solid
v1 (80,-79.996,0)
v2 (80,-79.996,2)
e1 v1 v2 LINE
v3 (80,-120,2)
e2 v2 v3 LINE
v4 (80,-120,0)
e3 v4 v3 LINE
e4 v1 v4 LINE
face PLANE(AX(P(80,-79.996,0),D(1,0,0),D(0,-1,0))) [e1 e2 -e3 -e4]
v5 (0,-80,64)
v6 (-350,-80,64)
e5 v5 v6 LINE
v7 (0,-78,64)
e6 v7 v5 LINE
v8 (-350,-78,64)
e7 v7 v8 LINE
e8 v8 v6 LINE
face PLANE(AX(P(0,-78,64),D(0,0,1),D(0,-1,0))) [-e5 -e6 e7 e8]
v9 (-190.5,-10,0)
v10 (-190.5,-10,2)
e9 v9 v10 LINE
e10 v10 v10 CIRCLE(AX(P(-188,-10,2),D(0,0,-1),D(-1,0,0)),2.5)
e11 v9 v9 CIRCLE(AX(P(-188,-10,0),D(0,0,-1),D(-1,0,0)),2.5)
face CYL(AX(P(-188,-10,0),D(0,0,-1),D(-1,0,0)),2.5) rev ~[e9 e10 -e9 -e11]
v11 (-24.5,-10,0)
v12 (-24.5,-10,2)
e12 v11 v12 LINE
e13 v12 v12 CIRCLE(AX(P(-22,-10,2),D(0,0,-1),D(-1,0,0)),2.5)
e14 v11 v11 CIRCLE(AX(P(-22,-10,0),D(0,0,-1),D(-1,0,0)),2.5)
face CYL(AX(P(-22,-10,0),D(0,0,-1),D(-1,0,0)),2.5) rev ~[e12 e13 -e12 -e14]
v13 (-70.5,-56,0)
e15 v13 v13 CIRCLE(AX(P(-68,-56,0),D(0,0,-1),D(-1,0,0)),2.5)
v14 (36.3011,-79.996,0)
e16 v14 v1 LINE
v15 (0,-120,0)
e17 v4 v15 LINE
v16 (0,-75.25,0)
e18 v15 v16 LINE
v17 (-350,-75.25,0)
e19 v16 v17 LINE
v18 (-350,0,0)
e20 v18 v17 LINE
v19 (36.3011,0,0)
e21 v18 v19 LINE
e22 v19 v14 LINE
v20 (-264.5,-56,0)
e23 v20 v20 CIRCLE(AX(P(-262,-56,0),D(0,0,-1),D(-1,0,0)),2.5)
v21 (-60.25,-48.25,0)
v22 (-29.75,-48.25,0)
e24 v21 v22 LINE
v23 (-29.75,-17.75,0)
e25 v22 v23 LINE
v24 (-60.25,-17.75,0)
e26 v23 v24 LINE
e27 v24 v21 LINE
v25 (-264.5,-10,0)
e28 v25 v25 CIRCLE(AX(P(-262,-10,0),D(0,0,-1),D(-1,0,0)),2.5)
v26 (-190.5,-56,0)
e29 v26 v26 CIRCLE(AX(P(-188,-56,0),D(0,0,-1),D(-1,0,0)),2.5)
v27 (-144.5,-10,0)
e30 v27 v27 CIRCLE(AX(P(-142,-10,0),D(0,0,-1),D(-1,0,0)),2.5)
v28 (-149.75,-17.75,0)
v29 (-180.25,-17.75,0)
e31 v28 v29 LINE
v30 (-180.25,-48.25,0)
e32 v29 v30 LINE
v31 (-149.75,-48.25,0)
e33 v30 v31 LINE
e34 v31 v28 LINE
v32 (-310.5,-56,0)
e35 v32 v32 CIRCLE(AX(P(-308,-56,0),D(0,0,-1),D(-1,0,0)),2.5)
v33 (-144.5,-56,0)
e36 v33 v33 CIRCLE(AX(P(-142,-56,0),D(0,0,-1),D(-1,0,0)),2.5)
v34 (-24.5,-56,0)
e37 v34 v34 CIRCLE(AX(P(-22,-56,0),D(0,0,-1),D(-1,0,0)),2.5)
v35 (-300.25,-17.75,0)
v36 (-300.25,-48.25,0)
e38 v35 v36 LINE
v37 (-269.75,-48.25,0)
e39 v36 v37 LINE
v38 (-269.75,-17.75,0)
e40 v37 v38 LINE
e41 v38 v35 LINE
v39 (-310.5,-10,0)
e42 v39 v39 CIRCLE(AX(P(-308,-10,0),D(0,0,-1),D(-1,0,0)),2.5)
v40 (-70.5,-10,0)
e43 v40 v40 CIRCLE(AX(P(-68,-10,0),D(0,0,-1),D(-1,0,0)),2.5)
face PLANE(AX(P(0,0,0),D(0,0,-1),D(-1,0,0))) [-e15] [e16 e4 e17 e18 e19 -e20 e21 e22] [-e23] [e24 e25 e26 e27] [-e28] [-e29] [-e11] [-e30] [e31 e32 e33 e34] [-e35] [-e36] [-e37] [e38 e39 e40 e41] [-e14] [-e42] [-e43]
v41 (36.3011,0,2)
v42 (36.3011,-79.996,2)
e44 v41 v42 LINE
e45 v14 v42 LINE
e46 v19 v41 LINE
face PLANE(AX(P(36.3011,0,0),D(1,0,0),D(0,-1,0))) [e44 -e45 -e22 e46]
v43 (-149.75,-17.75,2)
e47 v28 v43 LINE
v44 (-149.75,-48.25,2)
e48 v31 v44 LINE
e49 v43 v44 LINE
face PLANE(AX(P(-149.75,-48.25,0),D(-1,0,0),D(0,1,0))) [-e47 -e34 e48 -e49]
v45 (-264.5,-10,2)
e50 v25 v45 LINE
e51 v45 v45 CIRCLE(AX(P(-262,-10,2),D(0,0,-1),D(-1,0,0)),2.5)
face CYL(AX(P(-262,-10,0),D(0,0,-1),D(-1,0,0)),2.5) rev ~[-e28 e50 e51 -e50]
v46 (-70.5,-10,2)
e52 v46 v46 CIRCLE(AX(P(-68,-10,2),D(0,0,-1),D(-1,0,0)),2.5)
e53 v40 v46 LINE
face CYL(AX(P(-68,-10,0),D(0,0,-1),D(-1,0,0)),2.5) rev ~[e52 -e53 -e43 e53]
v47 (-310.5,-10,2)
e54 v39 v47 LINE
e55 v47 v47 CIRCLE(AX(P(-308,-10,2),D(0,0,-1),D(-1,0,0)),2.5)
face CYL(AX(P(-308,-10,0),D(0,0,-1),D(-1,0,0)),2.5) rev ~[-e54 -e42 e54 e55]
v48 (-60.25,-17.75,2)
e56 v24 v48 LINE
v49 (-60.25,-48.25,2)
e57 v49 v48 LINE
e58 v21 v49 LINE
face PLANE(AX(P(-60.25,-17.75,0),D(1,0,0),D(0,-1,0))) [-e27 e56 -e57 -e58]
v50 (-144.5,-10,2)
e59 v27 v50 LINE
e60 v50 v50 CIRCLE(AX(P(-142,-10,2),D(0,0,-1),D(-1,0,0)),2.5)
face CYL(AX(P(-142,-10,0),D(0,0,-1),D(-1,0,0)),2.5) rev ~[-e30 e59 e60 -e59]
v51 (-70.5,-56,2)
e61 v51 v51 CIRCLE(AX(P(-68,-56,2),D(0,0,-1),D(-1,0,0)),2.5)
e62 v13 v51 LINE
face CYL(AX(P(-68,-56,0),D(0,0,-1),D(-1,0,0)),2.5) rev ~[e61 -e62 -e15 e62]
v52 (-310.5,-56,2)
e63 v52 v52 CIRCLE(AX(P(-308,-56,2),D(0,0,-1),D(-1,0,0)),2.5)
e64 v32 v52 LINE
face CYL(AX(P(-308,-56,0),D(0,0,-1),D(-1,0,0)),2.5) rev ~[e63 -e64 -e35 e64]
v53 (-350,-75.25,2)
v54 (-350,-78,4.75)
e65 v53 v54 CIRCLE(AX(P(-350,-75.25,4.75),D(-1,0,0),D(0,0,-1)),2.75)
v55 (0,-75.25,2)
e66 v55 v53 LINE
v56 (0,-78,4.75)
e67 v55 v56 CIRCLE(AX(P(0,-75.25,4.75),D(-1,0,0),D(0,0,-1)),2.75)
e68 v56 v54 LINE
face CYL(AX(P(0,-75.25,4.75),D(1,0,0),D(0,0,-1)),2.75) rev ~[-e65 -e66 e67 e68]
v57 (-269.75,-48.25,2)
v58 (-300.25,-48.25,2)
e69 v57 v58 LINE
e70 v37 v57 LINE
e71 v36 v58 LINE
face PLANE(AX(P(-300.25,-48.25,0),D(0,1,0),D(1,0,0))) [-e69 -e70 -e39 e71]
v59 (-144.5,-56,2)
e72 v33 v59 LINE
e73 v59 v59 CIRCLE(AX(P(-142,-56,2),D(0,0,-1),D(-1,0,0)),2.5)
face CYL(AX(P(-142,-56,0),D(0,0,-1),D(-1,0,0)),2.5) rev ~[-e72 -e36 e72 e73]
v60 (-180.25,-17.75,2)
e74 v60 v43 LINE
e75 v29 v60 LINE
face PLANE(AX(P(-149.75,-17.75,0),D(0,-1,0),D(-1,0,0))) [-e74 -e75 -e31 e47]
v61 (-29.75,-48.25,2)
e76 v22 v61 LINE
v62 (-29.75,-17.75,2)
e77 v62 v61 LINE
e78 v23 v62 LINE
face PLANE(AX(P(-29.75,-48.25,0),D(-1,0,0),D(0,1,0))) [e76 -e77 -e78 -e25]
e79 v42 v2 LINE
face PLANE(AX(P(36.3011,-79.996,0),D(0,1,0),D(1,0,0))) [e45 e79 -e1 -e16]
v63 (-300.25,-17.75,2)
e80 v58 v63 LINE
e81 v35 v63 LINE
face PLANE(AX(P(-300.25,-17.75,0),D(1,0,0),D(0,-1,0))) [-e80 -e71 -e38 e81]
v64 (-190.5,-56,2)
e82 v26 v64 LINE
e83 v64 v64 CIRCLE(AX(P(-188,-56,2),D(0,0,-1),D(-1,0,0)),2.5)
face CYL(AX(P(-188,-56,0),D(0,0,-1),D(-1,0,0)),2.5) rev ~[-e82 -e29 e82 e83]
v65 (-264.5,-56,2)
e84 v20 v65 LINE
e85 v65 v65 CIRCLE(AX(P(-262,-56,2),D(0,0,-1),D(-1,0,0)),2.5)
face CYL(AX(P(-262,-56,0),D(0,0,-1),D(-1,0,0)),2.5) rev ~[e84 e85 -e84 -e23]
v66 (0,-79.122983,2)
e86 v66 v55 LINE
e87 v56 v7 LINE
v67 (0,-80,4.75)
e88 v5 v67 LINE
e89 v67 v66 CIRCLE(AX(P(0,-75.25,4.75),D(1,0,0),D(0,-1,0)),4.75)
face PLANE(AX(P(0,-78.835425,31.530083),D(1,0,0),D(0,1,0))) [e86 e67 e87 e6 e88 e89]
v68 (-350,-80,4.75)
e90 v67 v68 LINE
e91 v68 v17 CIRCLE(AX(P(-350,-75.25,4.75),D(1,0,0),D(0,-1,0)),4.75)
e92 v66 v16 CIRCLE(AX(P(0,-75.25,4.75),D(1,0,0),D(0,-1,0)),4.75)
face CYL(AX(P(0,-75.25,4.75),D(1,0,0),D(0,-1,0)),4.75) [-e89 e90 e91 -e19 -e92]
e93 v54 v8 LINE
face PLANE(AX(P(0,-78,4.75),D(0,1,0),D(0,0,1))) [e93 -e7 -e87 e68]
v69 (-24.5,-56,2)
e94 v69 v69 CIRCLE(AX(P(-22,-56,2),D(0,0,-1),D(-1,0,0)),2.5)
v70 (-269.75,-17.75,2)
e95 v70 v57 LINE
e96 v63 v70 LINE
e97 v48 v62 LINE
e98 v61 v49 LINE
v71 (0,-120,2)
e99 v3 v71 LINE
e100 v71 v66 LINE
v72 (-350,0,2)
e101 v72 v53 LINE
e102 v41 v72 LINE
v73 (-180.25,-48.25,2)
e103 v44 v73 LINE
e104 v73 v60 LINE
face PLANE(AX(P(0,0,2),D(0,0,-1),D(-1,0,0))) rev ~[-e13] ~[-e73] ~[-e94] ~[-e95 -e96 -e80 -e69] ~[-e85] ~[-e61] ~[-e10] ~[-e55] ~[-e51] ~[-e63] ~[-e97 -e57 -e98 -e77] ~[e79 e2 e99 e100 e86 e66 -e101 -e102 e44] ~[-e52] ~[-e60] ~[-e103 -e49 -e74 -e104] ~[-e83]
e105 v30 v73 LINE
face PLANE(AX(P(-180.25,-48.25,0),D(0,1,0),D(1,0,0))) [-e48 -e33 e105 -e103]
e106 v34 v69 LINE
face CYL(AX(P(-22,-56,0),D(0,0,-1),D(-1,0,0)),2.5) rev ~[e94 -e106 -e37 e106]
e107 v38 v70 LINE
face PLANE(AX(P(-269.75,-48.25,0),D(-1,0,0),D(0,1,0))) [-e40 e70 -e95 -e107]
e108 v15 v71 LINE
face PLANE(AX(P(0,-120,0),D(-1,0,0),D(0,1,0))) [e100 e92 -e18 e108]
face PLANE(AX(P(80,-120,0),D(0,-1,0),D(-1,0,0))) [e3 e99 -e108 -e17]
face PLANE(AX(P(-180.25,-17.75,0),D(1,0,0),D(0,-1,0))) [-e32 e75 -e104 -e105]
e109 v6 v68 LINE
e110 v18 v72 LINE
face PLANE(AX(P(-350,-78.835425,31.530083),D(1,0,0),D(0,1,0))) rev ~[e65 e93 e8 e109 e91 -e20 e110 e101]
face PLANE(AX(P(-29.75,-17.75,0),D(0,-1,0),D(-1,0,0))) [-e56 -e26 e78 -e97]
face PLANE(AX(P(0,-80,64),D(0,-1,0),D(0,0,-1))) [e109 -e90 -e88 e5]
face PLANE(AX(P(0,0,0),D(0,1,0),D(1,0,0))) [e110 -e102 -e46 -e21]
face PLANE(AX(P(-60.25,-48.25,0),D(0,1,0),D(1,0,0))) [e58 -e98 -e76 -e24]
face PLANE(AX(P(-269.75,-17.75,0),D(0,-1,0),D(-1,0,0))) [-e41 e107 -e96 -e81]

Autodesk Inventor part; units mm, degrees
ref_plane "YZ Plane" through (0, 0, 0) normal (1, 0, 0) x (0, 1, 0)
ref_plane "XZ Plane" through (0, 0, 0) normal (0, 1, 0) x (-1, 0, 0)
ref_plane "XY Plane" through (0, 0, 0) normal (0, 0, 1) x (1, 0, 0)
sketch "Sketch12" plane through (0, 0, 0) normal (0, 0, -1) x (-1, 0, 0)
  line L0 (0, 0) -> (-80, 0)
  line L1 (-80, 0) -> (-80, -120)
  line L2 (-80, -120) -> (0, -120)
  line L3 (0, -120) -> (0, 0)
  line L4 (-80, 0) -> (-36.3011, 0)
  line L5 (-36.3011, 0) -> (-36.3011, -79.996)
  line L6 (-36.3011, -79.996) -> (-80, -79.996)
  line L7 (-80, -79.996) -> (-80, 0)
  point P0 (-36.3011, 0)
  point P1 (-80, -79.996)
  dimension "d107" = 80
  dimension "d108" = 120
sketch "Sketch1" plane through (0, 0, 0) normal (0, 0, 1) x (1, 0, 0)
  line L0 (0, 0) -> (-350, 0)
  line L1 (0, -80) -> (0, 0)
  line L2 (-350, 0) -> (-350, -80)
  line L3 (-350, -80) -> (0, -80)
  point P0 (0, -40)
  dimension "d32" = 80
  dimension "d60" = 80
  dimension "d61" = 350
extrude "Plate1" add sketch "Sketch1" along normal blind 2
sketch "Sketch11" plane through (0, 0, 0) normal (0, 0, -1) x (-1, 0, 0)
  line L0 (60.25, -48.25) -> (29.75, -48.25)
  line L1 (29.75, -48.25) -> (29.75, -17.75)
  line L2 (29.75, -17.75) -> (60.25, -17.75)
  line L3 (60.25, -17.75) -> (60.25, -48.25)
  line L4 (60.25, -48.25) -> (29.75, -17.75) construction
  line L5 (29.75, -48.25) -> (60.25, -17.75) construction
  circle A0 centre (68, -56) radius 2.5
  circle A1 centre (22, -56) radius 2.5
  circle A2 centre (22, -10) radius 2.5
  circle A3 centre (68, -10) radius 2.5
  line L6 (29.75, -48.25) -> (22, -56) construction
  line L7 (0, -80) -> (0, 0) projected
  line L8 (0, 0) -> (350, 0) projected
  line L9 (350, -80) -> (0, -80) projected
  line L10 (22, -10) -> (68, -10) construction
  line L11 (68, -10) -> (68, -56) construction
  line L12 (68, -56) -> (22, -56) construction
  line L13 (22, -56) -> (22, -10) construction
  point P0 (45, -33)
  dimension "d88" = 30.5
  dimension "d89" = 30.5
  dimension "d90" = 5
  dimension "d92" = 10.9602
  dimension "d95" = 45
  dimension "d105" = 46
  dimension "d106" = 10
extrude "Extrusion2" cut sketch "Sketch11" against normal through all
sketch "Sketch9" plane through (-350, -78, 0) normal (0, -1, 0) x (1, 0, 0)
  line L0 (350, 0) -> (0, 0)
  line L1 (0, 0) -> (0, -64)
  line L2 (0, -64) -> (350, -64)
  line L3 (350, -64) -> (350, 0)
edge flange "Flange3" height 64 angle 90 thickness 2 bend radius 2.75 thickness toward (0, -1, 0) relief round relief width 2 relief depth 1 edges at (-175, -80, 0) wall of the first edge with corners at (0, -78, 0) (-350, -78, 0) (-350, -78, 64) (0, -78, 64)
bend "Bend3"
corner "Corner3"
pattern_linear "Rectangular Pattern2" count 3 spacing 120 along (-1, 0, 0) of "Extrusion2"
sheet face with bend "Face3" sketch "Sketch12" thickness 2 toward (0, 0, 1) bend radius 2.75 contours L3 L2 L1 L6 L5 L0
bend "Bend5"
equation "\"d2\" = Thickness"
equation "\"d62\" = BendReliefWidth"
equation "\"d63\" = BendReliefDepth"
equation "\"d64\" = MinimumRemnant"
equation "\"d65\" = TransitionRadius"
equation "\"d66\" = MAIN_7_central_window_width + 2 * Thickness"
equation "\"d68\" = BendRadius"
equation "\"d69\" = CornerReliefSize"
equation "\"d70\" = GapSize"
equation "\"d71\" = JacobiRadiusSize"
equation "\"BendReliefWidth\" = Thickness"
equation "\"BendReliefDepth\" = 0.5 * Thickness"
equation "\"CornerReliefSize\" = 4 * Thickness"
equation "\"MinimumRemnant\" = 2 * Thickness"
equation "\"TransitionRadius\" = BendRadius"
equation "\"JacobiRadiusSize\" = BendRadius"
equation "\"GapSize\" = Thickness"
equation "\"Thickness\" = 2"
equation "\"MAIN_7_central_window_width\" = 60"
equation "\"BendRadius\" = 2.75"
properties part number "PRS-1423 BOTTOM FDS diameter way down_CPY" material "Stainless Steel"
